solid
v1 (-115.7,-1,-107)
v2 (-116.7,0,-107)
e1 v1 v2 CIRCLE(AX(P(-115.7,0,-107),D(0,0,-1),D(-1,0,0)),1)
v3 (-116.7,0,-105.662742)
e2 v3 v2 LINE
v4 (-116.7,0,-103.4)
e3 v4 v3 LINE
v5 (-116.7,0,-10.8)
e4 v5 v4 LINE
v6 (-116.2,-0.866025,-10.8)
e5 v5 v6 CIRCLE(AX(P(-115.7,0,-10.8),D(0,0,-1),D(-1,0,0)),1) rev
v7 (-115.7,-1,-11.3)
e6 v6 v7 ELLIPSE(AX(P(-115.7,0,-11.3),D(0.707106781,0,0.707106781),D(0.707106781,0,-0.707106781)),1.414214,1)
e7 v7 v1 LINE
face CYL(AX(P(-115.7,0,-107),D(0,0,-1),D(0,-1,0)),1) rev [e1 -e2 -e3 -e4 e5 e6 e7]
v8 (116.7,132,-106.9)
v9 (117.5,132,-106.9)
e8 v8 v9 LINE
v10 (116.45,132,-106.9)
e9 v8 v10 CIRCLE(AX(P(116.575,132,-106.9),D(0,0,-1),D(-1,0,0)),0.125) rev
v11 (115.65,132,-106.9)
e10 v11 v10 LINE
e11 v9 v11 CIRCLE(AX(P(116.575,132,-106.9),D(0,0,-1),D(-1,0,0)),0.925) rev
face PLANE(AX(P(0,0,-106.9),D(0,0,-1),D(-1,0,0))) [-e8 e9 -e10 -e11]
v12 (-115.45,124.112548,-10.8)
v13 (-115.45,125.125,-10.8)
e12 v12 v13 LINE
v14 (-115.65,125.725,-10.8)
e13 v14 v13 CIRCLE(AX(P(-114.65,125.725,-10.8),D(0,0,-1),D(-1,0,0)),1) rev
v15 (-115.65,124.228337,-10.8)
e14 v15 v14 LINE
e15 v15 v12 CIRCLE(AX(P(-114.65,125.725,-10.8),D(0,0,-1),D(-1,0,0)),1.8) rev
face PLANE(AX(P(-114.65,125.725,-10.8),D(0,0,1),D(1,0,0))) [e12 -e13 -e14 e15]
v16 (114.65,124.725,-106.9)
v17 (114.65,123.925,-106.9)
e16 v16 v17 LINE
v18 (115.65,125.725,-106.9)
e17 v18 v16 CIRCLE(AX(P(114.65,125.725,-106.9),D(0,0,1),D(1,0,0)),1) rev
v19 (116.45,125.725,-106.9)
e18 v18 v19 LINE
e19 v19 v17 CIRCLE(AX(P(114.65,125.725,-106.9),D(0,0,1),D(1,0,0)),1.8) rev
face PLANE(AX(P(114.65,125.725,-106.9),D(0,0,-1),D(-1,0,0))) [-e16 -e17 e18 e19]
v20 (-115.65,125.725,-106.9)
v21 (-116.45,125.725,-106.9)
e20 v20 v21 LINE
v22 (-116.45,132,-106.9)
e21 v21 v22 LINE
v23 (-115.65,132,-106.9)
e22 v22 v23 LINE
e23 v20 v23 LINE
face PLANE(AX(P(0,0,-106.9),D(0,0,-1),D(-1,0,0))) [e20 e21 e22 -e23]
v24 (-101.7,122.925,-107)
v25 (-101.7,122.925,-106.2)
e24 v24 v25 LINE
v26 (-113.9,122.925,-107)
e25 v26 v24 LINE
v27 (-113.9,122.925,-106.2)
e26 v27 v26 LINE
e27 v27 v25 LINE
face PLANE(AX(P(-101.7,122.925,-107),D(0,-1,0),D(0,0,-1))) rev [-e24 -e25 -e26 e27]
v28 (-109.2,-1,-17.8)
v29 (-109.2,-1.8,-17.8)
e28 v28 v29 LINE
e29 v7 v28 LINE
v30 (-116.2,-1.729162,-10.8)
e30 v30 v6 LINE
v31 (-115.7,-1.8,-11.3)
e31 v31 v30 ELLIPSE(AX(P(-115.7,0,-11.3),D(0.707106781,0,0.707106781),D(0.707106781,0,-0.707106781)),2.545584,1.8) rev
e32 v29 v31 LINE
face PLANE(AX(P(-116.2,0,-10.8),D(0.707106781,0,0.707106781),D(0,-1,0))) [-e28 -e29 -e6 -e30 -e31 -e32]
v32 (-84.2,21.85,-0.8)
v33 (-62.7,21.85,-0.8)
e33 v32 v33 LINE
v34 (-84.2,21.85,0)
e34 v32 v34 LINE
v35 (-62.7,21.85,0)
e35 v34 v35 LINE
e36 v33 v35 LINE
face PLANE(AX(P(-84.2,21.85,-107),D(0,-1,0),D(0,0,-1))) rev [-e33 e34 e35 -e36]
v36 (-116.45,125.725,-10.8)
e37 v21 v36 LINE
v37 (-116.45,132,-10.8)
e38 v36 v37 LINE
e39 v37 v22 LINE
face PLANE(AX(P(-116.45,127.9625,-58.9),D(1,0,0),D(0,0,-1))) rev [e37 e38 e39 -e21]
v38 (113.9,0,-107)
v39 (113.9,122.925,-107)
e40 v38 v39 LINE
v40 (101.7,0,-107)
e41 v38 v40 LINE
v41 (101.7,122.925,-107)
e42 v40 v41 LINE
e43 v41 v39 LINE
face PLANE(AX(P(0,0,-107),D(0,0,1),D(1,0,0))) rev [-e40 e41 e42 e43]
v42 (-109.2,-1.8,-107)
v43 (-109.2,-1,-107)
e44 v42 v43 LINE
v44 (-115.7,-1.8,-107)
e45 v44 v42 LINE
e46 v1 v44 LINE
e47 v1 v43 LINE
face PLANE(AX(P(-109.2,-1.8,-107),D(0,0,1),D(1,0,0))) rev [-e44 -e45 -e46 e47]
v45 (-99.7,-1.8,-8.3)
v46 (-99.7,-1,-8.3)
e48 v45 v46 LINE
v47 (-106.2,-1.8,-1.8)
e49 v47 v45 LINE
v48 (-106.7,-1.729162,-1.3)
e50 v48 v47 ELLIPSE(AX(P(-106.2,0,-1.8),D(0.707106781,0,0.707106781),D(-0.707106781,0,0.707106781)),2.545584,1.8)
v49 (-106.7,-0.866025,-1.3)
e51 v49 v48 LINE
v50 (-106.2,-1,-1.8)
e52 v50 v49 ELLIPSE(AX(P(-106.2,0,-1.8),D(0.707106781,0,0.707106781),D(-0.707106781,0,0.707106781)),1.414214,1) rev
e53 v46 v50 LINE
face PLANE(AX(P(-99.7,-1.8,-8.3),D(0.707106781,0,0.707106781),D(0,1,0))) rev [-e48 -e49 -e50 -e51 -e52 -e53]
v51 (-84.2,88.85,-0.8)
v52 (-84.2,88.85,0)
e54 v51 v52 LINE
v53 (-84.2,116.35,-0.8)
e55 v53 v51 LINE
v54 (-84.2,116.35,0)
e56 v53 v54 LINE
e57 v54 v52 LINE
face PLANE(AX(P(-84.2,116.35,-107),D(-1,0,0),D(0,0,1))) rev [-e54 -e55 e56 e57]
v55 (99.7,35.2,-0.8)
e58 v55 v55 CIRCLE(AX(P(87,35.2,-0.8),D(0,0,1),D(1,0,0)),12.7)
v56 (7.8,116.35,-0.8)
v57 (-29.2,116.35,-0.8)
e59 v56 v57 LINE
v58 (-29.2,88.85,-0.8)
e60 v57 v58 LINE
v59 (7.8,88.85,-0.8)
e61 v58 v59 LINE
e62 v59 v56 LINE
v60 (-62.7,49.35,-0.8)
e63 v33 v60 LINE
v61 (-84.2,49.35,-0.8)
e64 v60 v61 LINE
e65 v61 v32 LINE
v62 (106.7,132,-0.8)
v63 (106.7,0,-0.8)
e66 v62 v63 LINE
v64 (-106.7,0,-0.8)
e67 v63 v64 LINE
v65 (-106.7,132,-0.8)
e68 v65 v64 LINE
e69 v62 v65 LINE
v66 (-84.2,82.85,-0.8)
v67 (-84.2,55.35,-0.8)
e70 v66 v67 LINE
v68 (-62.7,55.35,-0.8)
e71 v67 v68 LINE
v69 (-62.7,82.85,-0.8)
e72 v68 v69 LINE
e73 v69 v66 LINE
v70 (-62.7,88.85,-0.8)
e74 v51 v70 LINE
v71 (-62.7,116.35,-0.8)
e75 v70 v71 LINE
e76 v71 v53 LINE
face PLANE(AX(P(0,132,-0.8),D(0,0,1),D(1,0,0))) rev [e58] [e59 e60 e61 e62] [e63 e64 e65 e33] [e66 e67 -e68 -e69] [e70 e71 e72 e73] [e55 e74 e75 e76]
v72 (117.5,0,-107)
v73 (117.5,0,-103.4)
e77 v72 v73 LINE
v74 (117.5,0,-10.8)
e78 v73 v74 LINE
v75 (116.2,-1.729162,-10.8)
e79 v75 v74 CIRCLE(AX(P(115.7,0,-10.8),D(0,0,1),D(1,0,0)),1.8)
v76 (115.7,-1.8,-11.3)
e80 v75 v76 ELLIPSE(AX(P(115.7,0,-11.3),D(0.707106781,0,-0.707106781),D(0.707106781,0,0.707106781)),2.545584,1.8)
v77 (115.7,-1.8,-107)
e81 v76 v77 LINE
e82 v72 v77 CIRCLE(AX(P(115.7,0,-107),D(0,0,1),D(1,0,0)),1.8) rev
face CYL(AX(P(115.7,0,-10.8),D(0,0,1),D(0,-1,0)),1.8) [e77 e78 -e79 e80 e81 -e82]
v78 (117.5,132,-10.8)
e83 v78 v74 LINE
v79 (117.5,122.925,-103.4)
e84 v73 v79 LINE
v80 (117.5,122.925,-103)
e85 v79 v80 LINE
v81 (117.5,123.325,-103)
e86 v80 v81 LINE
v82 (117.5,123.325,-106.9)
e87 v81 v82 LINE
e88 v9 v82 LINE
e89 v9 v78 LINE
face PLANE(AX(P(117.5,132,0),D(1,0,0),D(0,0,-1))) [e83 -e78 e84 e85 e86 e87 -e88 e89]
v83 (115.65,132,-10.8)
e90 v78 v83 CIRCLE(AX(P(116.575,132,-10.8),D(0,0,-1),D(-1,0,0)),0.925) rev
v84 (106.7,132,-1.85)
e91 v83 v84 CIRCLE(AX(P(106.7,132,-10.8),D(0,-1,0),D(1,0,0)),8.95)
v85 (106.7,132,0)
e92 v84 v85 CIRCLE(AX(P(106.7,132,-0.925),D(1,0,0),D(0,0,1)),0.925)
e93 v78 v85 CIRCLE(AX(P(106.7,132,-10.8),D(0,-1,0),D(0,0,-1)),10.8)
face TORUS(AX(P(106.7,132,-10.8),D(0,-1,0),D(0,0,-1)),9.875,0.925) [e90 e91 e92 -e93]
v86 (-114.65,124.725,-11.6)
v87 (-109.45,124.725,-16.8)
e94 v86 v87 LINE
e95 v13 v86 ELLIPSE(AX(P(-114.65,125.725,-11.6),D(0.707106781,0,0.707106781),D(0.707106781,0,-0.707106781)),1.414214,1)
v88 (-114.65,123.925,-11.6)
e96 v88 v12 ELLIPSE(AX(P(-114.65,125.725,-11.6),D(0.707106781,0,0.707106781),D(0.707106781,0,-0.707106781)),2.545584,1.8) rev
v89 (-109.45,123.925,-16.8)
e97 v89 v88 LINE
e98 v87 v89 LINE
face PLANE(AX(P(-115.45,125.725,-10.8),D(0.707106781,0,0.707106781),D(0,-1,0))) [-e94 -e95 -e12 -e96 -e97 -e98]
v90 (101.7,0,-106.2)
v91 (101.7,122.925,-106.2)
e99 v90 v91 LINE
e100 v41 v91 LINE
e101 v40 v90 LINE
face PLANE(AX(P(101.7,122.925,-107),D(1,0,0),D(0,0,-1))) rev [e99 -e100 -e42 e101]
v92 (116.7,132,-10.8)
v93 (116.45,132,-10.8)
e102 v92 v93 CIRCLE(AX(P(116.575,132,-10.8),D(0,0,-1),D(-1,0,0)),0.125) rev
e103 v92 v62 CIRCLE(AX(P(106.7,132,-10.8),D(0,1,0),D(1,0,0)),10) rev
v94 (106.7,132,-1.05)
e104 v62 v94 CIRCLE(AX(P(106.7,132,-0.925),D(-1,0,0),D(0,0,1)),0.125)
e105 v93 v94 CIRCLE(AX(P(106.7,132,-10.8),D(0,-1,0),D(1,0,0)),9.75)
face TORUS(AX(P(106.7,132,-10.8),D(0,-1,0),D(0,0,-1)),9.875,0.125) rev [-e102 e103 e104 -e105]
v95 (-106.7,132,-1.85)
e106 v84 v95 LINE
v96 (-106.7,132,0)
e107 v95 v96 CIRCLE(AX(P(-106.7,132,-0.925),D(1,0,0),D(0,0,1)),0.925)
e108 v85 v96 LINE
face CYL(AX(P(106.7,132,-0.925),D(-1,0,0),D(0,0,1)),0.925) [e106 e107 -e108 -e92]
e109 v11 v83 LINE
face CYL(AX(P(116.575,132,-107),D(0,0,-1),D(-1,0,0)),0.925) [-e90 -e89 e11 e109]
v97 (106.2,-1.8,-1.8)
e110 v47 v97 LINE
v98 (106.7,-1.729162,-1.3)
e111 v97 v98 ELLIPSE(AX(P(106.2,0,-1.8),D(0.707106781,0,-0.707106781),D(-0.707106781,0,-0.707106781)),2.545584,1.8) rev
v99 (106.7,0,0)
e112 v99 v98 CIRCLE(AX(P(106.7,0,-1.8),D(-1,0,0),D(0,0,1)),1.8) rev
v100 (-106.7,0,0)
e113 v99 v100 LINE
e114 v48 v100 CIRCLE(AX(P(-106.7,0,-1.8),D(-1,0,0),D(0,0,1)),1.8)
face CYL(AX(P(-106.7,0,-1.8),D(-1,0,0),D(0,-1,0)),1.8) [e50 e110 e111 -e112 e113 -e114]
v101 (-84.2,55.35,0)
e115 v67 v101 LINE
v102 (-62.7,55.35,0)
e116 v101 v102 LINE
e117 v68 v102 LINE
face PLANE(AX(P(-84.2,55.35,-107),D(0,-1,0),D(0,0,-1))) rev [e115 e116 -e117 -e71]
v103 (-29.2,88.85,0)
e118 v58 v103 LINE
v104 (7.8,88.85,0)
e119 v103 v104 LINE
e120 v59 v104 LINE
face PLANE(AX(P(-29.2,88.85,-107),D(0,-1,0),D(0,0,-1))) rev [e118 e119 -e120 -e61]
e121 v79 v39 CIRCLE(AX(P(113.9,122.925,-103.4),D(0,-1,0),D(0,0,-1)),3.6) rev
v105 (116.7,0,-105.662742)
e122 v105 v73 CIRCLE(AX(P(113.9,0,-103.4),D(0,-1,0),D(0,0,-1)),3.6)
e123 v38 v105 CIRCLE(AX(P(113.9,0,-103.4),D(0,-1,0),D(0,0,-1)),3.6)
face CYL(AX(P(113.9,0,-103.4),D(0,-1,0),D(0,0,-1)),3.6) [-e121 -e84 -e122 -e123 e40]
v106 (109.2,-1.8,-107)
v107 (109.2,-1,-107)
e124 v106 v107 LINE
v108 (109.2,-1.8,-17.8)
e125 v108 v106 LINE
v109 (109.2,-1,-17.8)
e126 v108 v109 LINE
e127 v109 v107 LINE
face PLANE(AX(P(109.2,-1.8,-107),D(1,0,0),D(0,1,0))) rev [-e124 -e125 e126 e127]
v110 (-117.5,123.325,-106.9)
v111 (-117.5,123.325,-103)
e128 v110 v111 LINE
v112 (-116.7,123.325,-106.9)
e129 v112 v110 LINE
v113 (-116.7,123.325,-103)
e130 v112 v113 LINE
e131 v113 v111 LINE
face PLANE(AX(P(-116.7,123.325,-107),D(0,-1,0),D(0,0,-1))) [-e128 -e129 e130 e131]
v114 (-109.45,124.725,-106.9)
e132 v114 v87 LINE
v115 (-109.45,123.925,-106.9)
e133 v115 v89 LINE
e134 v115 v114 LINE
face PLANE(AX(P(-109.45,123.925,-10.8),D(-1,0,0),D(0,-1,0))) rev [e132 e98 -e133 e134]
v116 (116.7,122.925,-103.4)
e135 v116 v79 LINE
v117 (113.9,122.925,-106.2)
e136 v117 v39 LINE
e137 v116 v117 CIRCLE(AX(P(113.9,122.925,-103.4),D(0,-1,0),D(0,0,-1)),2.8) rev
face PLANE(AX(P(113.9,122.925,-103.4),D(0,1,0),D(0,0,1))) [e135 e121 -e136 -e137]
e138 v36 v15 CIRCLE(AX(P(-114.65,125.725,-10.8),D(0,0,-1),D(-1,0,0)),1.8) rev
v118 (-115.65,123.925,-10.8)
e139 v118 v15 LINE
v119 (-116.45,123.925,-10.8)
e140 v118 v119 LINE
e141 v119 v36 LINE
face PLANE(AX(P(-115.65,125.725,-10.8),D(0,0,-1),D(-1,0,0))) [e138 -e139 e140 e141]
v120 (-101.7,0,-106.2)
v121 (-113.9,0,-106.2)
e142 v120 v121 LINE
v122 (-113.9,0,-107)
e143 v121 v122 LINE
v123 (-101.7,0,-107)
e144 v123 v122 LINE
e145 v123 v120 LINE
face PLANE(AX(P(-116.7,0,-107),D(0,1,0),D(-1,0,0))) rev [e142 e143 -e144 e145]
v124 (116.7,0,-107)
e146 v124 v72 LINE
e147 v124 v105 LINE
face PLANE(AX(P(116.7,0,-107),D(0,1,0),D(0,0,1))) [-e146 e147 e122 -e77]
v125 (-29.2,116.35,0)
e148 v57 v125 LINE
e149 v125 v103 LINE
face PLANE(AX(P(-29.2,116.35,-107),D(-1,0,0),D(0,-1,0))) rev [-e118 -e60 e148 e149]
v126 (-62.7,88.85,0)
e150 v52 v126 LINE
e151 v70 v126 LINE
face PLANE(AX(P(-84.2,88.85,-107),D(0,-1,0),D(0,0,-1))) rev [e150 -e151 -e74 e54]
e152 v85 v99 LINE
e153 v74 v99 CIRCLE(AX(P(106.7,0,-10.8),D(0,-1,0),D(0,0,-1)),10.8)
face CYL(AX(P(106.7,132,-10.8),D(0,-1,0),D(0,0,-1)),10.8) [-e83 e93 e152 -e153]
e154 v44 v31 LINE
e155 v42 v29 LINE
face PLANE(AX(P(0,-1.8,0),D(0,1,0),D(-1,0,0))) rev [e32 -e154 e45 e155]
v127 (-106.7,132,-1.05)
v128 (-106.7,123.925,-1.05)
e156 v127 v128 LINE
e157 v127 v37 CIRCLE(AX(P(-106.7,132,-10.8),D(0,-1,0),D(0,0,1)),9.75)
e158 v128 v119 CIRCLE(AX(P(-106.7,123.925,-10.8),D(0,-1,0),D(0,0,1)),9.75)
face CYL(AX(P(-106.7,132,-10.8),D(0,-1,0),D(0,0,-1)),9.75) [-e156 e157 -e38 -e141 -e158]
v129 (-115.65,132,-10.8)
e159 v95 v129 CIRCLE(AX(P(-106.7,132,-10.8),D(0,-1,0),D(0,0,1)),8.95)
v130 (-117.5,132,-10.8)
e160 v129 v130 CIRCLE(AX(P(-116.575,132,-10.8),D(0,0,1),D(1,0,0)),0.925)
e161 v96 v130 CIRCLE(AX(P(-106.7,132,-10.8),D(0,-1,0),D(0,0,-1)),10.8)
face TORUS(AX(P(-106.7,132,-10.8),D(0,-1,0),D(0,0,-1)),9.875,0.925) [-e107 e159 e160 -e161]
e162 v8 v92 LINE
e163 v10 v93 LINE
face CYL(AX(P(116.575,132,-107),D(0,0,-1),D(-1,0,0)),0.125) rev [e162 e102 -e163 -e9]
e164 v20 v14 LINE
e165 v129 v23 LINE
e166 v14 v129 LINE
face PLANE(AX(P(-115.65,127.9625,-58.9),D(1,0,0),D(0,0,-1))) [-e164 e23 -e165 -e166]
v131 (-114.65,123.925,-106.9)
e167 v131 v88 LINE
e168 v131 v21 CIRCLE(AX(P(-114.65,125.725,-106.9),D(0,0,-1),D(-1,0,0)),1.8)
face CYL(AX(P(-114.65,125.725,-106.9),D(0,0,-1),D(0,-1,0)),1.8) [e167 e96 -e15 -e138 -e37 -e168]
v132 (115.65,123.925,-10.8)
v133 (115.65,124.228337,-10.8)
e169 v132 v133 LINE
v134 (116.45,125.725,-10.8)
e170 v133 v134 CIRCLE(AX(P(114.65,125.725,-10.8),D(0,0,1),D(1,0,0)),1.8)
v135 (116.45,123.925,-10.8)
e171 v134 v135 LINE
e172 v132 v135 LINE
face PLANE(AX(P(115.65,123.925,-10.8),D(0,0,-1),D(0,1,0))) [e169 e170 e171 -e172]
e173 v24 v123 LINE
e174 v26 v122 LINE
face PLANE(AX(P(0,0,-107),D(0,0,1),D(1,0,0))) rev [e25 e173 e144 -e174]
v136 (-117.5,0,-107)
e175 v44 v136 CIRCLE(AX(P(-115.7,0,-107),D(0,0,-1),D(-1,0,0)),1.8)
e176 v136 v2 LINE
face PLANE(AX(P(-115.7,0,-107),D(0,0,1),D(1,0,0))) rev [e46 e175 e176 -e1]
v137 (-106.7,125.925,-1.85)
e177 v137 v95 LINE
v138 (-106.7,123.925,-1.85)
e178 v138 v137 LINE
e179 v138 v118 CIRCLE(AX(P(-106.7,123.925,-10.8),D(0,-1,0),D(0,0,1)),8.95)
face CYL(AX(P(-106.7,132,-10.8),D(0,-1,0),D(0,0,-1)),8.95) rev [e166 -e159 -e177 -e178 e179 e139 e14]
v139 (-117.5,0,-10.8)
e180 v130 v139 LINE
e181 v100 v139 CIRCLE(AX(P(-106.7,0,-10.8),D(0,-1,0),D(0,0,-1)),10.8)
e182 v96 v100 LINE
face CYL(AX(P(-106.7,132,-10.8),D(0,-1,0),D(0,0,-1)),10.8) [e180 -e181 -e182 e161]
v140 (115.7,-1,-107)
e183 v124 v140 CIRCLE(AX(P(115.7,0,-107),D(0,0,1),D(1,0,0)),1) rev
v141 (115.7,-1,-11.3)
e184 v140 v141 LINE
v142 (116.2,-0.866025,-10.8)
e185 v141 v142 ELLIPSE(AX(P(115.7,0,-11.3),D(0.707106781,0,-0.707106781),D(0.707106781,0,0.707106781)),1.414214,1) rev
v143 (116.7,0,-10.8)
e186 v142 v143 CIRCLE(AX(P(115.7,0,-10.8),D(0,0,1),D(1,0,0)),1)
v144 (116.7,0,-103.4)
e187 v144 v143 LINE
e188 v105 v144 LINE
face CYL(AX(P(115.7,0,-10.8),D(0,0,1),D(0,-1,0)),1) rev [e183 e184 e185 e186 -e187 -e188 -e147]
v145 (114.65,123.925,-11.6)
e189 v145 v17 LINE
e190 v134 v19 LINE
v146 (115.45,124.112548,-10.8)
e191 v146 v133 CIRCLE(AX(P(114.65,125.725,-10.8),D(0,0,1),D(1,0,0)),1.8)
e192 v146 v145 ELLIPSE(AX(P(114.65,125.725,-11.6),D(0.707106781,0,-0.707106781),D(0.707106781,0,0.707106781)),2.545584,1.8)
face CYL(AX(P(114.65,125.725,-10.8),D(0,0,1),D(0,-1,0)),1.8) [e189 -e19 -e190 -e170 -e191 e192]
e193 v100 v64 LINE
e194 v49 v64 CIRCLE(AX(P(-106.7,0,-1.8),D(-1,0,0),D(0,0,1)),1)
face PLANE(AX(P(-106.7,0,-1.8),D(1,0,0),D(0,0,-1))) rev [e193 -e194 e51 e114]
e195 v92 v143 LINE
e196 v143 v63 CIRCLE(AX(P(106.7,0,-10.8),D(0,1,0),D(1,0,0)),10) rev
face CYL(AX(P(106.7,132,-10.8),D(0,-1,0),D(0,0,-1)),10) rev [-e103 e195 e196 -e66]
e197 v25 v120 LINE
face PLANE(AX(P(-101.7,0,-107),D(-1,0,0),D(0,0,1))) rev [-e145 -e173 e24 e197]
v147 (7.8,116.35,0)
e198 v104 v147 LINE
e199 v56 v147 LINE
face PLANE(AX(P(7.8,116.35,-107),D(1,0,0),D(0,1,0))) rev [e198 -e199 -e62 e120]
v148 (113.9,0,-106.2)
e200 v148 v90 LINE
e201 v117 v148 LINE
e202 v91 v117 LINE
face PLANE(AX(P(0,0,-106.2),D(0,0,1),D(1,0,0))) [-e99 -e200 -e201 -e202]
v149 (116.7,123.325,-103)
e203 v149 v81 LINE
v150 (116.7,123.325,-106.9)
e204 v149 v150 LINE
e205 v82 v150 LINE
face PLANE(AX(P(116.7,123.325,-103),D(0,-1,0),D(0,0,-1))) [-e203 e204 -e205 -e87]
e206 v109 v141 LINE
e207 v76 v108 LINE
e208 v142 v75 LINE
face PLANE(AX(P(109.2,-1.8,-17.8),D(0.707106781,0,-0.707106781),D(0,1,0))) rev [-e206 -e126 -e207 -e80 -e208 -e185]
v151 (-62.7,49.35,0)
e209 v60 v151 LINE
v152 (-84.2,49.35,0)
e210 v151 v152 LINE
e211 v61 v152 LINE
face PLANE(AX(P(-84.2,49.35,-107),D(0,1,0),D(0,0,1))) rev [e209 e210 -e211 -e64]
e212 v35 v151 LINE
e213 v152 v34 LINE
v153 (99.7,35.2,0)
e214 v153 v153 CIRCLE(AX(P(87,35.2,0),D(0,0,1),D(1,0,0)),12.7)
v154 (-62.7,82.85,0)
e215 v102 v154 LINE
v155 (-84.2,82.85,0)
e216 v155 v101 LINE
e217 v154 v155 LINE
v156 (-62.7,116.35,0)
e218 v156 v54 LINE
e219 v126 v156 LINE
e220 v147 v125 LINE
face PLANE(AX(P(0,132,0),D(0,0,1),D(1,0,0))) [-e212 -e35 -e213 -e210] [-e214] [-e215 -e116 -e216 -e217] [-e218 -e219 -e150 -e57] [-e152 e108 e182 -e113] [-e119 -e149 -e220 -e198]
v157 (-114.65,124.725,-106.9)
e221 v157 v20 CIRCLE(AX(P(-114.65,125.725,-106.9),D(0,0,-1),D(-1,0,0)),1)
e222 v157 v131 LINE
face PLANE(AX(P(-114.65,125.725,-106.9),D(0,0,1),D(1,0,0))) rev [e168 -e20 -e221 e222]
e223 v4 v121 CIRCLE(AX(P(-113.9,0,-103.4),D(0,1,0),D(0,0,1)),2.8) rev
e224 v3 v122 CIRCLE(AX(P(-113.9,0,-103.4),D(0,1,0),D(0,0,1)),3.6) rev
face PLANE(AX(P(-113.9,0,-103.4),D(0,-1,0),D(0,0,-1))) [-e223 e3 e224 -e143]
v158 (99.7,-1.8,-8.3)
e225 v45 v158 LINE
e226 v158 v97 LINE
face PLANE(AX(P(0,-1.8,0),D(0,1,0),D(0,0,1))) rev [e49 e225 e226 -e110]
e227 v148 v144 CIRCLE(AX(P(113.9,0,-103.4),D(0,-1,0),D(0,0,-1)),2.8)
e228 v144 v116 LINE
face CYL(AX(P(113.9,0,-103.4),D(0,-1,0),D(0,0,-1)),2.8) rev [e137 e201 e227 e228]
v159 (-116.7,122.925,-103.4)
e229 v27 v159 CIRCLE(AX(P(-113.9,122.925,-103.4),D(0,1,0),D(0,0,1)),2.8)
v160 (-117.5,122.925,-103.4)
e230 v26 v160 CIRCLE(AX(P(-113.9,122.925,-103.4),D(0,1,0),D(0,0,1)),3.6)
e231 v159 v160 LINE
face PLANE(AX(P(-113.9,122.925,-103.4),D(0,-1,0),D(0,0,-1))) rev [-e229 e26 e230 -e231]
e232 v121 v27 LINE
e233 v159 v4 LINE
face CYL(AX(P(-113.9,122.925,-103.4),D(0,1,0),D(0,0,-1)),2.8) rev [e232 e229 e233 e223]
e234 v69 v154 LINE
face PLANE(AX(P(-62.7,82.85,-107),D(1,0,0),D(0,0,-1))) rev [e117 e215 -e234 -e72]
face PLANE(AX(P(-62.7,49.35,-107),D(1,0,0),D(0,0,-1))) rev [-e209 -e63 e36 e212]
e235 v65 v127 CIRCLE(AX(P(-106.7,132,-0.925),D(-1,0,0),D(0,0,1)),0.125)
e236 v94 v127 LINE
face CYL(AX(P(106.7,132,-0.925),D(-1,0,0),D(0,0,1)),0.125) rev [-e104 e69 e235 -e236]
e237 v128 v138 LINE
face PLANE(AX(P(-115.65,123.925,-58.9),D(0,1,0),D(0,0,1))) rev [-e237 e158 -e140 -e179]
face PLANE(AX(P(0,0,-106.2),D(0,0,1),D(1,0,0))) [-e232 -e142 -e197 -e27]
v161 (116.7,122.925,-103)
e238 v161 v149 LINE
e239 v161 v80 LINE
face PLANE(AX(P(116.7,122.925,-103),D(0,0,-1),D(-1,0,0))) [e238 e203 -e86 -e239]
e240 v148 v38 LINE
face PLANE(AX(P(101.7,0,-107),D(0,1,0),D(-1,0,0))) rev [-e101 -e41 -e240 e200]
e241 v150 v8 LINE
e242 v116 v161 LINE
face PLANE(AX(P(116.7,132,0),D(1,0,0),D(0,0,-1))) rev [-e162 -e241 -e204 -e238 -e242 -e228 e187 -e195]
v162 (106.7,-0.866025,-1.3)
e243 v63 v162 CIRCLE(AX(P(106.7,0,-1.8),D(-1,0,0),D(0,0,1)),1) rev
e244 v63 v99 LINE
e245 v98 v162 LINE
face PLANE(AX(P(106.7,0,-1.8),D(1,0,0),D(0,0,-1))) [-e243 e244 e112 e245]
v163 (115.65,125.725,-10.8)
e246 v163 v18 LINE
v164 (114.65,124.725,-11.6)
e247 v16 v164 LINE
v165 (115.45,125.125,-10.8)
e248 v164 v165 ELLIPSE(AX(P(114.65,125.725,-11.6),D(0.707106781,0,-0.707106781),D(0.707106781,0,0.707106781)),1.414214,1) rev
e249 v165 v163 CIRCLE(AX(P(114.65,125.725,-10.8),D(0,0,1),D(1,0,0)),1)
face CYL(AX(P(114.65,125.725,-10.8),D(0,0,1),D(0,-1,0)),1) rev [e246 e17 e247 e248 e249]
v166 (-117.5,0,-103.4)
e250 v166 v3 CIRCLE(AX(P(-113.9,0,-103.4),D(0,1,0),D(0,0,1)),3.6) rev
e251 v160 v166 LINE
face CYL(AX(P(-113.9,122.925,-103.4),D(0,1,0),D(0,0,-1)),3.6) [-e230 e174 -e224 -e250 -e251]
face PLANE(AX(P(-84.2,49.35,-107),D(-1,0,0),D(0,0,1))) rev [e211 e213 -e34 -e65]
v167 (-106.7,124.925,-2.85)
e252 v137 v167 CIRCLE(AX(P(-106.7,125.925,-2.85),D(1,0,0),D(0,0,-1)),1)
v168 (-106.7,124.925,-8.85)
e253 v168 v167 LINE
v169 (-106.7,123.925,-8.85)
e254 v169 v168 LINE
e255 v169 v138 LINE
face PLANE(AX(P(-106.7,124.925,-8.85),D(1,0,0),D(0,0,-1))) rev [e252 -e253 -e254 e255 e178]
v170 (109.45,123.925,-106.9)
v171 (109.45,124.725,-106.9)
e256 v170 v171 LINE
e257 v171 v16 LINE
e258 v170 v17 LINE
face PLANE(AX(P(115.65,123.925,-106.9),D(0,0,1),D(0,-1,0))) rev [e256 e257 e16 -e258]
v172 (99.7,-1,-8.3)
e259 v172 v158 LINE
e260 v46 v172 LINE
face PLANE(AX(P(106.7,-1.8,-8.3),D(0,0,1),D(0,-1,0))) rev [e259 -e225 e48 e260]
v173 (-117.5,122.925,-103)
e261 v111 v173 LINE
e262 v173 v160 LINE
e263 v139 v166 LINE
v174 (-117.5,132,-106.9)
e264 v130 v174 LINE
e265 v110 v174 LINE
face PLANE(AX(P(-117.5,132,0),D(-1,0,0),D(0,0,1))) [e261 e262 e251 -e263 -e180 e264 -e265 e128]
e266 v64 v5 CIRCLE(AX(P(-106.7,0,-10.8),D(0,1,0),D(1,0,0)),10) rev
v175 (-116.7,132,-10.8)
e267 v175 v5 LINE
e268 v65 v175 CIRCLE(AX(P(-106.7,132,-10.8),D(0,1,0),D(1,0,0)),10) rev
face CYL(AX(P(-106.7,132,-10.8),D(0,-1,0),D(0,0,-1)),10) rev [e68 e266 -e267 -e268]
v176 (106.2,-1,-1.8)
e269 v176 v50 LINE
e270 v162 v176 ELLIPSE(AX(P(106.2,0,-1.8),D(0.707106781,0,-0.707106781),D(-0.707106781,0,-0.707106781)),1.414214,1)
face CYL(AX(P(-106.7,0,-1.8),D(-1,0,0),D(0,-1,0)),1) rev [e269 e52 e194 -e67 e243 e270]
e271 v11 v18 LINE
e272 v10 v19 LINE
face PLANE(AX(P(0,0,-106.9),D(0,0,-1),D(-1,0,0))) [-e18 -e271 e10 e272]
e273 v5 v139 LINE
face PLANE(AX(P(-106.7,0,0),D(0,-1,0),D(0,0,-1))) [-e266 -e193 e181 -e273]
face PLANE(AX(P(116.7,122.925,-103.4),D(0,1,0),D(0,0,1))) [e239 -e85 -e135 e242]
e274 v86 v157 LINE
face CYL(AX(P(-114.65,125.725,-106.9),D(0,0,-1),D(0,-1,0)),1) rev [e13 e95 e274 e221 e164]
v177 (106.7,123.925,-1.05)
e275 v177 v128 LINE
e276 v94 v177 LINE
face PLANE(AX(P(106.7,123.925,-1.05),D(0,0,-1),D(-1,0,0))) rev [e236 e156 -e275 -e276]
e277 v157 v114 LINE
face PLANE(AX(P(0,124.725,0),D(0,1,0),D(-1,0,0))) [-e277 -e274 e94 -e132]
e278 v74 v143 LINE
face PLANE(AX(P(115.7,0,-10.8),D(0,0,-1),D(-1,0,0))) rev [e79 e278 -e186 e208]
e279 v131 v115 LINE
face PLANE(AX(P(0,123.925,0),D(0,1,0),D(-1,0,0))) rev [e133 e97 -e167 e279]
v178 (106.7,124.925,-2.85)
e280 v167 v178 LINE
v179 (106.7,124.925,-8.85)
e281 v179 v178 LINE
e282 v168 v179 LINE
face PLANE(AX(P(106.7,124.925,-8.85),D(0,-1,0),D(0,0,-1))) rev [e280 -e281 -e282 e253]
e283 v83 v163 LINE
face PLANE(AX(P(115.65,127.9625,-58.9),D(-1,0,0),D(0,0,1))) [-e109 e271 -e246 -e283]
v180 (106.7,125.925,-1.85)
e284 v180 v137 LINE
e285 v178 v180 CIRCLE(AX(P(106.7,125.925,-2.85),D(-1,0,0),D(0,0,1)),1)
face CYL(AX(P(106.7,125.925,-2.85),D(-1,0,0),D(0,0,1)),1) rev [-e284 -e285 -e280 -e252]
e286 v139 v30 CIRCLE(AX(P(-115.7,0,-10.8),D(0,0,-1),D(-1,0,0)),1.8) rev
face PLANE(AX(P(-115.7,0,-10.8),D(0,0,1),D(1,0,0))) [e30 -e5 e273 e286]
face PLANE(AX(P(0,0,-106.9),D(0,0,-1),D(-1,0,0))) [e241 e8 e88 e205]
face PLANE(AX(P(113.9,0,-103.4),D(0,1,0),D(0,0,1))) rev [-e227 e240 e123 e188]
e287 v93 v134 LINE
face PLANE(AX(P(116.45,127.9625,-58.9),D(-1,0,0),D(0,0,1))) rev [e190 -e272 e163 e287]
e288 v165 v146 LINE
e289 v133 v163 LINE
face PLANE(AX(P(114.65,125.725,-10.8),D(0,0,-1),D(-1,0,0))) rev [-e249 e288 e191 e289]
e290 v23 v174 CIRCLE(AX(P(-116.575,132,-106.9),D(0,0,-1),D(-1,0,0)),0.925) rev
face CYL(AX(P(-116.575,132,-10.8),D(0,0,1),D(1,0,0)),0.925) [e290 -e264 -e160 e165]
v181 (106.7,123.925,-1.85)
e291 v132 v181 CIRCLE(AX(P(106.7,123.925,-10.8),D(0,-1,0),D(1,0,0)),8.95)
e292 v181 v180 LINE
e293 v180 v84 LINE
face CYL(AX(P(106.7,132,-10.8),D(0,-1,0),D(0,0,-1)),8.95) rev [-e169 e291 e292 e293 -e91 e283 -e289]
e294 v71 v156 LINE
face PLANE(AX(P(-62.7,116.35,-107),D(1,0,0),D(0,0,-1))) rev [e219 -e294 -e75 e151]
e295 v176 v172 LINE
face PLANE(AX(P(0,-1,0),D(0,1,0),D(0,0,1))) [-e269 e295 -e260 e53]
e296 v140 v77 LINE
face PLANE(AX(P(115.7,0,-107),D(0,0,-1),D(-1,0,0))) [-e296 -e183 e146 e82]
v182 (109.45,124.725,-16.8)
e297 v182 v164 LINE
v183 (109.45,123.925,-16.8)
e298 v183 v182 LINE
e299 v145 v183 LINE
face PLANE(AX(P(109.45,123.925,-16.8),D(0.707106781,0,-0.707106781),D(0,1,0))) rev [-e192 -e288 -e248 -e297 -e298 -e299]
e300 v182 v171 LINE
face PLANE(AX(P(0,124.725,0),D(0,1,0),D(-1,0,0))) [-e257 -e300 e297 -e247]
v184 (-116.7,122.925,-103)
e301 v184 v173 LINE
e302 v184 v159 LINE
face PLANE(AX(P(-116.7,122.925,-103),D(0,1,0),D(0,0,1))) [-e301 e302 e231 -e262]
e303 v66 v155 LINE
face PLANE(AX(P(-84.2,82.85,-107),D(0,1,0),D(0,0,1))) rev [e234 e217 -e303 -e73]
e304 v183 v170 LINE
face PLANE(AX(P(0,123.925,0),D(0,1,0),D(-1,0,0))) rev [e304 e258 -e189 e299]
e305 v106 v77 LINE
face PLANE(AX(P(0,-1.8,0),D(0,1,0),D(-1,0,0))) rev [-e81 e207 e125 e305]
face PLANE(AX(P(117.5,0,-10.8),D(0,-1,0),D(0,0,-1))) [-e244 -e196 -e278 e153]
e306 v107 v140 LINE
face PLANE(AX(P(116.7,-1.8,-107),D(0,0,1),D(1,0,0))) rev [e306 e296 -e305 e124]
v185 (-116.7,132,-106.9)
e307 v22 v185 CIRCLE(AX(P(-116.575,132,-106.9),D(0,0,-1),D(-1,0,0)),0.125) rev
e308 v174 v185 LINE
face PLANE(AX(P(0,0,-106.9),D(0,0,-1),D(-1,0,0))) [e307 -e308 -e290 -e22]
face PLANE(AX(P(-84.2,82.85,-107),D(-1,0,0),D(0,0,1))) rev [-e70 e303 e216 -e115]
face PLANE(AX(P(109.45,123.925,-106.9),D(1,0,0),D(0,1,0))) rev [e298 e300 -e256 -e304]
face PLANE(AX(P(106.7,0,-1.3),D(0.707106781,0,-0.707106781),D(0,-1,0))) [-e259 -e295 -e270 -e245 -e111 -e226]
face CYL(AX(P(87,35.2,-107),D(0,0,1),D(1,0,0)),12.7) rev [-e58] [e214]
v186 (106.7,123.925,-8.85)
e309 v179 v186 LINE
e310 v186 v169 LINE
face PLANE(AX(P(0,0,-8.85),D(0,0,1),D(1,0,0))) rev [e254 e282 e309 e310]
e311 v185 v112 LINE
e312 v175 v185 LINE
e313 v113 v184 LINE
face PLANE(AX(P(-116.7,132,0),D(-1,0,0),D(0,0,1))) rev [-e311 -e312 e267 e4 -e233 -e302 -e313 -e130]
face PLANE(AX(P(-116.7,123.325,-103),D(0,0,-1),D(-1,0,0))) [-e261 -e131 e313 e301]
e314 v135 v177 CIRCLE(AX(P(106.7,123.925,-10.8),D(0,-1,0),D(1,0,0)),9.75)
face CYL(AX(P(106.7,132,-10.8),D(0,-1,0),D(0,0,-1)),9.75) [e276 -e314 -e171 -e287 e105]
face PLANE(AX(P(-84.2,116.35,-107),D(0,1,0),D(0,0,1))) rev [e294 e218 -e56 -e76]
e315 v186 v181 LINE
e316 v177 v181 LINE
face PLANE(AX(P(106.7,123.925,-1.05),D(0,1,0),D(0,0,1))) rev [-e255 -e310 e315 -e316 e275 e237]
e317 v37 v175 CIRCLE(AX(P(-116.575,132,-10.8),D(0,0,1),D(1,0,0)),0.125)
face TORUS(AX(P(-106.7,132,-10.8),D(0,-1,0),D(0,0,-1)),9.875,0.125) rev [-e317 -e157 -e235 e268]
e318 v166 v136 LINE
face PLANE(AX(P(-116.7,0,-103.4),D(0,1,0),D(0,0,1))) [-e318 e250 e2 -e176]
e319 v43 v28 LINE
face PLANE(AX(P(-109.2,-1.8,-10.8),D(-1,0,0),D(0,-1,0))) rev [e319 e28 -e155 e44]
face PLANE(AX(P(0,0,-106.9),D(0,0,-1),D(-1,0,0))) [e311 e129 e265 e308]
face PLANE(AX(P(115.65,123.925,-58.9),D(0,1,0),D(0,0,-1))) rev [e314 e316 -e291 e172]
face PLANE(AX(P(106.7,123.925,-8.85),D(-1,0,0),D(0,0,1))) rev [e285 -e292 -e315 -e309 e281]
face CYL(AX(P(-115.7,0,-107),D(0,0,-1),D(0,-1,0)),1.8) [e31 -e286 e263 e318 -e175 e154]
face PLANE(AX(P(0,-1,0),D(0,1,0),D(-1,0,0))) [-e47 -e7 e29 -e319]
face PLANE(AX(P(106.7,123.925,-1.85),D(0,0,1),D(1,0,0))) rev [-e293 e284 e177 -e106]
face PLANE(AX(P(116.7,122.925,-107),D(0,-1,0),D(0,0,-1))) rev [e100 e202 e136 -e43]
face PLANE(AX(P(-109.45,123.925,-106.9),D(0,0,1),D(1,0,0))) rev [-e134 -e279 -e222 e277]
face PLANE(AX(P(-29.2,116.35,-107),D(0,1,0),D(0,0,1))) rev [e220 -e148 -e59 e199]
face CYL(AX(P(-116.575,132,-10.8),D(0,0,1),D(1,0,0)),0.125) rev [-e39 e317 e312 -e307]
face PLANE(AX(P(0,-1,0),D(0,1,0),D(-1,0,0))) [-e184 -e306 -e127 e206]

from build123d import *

# Parameters (mm, degrees)
BASE_FLANGE1_DEPTH        = 132
HEM2_START                = -107
HEM2_DEPTH                = 96.2
SKETCH31_R                = 12.7
CUT_EXTRUDE1_DEPTH        = 208.181817916
EDGE_FLANGE1_DEPTH        = 96.2
EDGE_FLANGE1_BEND_DEPTH   = 213.4
EDGE_FLANGE1_BEND_2_DEPTH = 96.2
CHAMFER1_SIZE             = 7
SKETCH41_W                = 21.5
SKETCH41_H                = 27.5
CUT_EXTRUDE2_DEPTH        = 208.181817916
LPATTERN1_COUNT           = 3
LPATTERN1_PITCH           = 33.5
SKETCH44_W                = 235
SKETCH44_H                = 10
CUT_EXTRUDE3_DEPTH        = 0.1
EDGE_FLANGE2_DEPTH        = 123.325
EDGE_FLANGE2_START        = 122.925
EDGE_FLANGE2_2_DEPTH      = 0.4
EDGE_FLANGE2_3_DEPTH      = 122.925
EDGE_FLANGE4_START        = -106.9
EDGE_FLANGE4_DEPTH        = 96.1
EDGE_FLANGE4_2_DEPTH      = 96.1
CHAMFER2_SIZE             = 6
SKETCH80_W                = 213.4
SKETCH80_H                = 1
BOSS_EXTRUDE1_DEPTH       = 7
FILLET1_R                 = 1
SKETCH92_W                = 37
SKETCH92_H                = 27.5
CUT_EXTRUDE4_DEPTH        = 208.181817916


# Read off the part's stored shape, not the designer's step: Hem2, Edge-Flange2, Edge-Flange4
# Sheet-metal steps are written as plain solids
with BuildPart() as part:
    # Sketch1 → Base-Flange1 (new body)
    with BuildSketch(Plane(origin=(0, 0, 0), x_dir=(1, 0, 0), z_dir=(0, 1, 0))):
        with BuildLine():
            Line((117.5, 107), (117.5, 10.8))
            ThreePointArc((117.5, 10.8), (114.336753237, 3.163246763), (106.7, 0))
            Line((106.7, 0), (0, 0))
            Line((0, 0), (-106.7, 0))
            ThreePointArc((-106.7, 0), (-114.336753237, 3.163246763), (-117.5, 10.8))
            Line((-117.5, 10.8), (-117.5, 107))
            Line((-117.5, 107), (-116.7, 107))
            Line((-116.7, 107), (-116.7, 10.8))
            ThreePointArc((-116.7, 10.8), (-113.771067812, 3.728932188), (-106.7, 0.8))
            Line((-106.7, 0.8), (0, 0.8))
            Line((0, 0.8), (106.7, 0.8))
            ThreePointArc((106.7, 0.8), (113.771067812, 3.728932188), (116.7, 10.8))
            Line((116.7, 10.8), (116.7, 107))
            Line((116.7, 107), (117.5, 107))
        make_face()
    extrude(amount=BASE_FLANGE1_DEPTH)

    # Hem2 outline → Hem2 (add)
    with BuildSketch(Plane.XY.offset(HEM2_START)):
        with BuildLine():
            Line((-116.45, 123.925), (-115.65, 123.925))
            Line((-115.65, 123.925), (-115.65, 132))
            ThreePointArc((-115.65, 132), (-116.575, 132.925), (-117.5, 132))
            Line((-117.5, 132), (-116.7, 132))
            ThreePointArc((-116.7, 132), (-116.575, 132.125), (-116.45, 132))
            Line((-116.45, 132), (-116.45, 123.925))
        make_face()
        with BuildLine():
            Line((115.65, 123.925), (116.45, 123.925))
            Line((116.45, 123.925), (116.45, 132))
            ThreePointArc((116.45, 132), (116.575, 132.125), (116.7, 132))
            Line((116.7, 132), (117.5, 132))
            ThreePointArc((117.5, 132), (116.575, 132.925), (115.65, 132))
            Line((115.65, 132), (115.65, 123.925))
        make_face()
    extrude(amount=HEM2_DEPTH)

    # Sweep1: sweep along a path in Sketch30
    with BuildLine(Plane(origin=(0, 132, 0), x_dir=(1, 0, 0), z_dir=(0, 1, 0))) as sweep1_path:
        ThreePointArc((-116.7, 10.8), (-113.771067812, 3.728932188), (-106.7, 0.8))
        Line((-106.7, 0.8), (106.7, 0.8))
        ThreePointArc((106.7, 0.8), (113.771067812, 3.728932188), (116.7, 10.8))
    # Sketch29 → Sweep1 (sweep)
    with BuildSketch(Plane.XY.offset(-10.8)):
        with BuildLine():
            Line((-117.5, 132), (-116.7, 132))
            ThreePointArc((-116.7, 132), (-116.575, 132.125), (-116.45, 132))
            Line((-116.45, 132), (-116.45, 123.925))
            Line((-116.45, 123.925), (-115.65, 123.925))
            Line((-115.65, 123.925), (-115.65, 132))
            ThreePointArc((-115.65, 132), (-116.575, 132.925), (-117.5, 132))
        make_face()
    sweep(path=sweep1_path.line)

    # Sketch31 → Cut-Extrude1 (cut, through all)
    with BuildSketch(Plane.XY):
        with Locations((87, 35.2)):
            Circle(SKETCH31_R)
    extrude(amount=-CUT_EXTRUDE1_DEPTH, mode=Mode.SUBTRACT)

    # Edge-Flange1 section (across the edge) → Edge-Flange1 (add)
    with BuildSketch(Plane(origin=(-116.7, -1, -10.8), x_dir=(0, 1, 0), z_dir=(0, 0, -1))):
        with BuildLine():
            Line((-0.8, 1), (-0.8, 7.5))
            Line((-0.8, 7.5), (0, 7.5))
            Line((0, 7.5), (0, 1))
            ThreePointArc((0, 1), (0.292893219, 0.292893219), (1, 0))
            Line((1, 0), (1, -0.8))
            ThreePointArc((1, -0.8), (-0.272792206, -0.272792206), (-0.8, 1))
        make_face()
    extrude(amount=EDGE_FLANGE1_DEPTH)

    # Edge-Flange1 section 2 (across the edge) → Edge-Flange1 bend (add)
    with BuildSketch(Plane(origin=(106.7, -1, -0.8), x_dir=(0, 1, 0), z_dir=(-1, 0, 0))):
        with BuildLine():
            Line((-0.8, 1), (-0.8, 7.5))
            Line((-0.8, 7.5), (0, 7.5))
            Line((0, 7.5), (0, 1))
            ThreePointArc((0, 1), (0.292893219, 0.292893219), (1, 0))
            Line((1, 0), (1, -0.8))
            ThreePointArc((1, -0.8), (-0.272792206, -0.272792206), (-0.8, 1))
        make_face()
    extrude(amount=EDGE_FLANGE1_BEND_DEPTH)

    # Edge-Flange1 section 3 (across the edge) → Edge-Flange1 bend 2 (add)
    with BuildSketch(Plane(origin=(116.7, -1, -107), x_dir=(0, 1, 0), z_dir=(0, 0, 1))):
        with BuildLine():
            Line((-0.8, 1), (-0.8, 7.5))
            Line((-0.8, 7.5), (0, 7.5))
            Line((0, 7.5), (0, 1))
            ThreePointArc((0, 1), (0.292893219, 0.292893219), (1, 0))
            Line((1, 0), (1, -0.8))
            ThreePointArc((1, -0.8), (-0.272792206, -0.272792206), (-0.8, 1))
        make_face()
    extrude(amount=EDGE_FLANGE1_BEND_2_DEPTH)

    # Chamfer1
    chamfer1_edges = [part.edges().sort_by_distance(p)[0] for p in [
        (106.7, -1.4, -8.3),
        (109.2, -1.4, -10.8),
        (-106.7, -1.4, -8.3),
        (-109.2, -1.4, -10.8),
    ]]
    chamfer(chamfer1_edges, length=CHAMFER1_SIZE)

    # Sketch41 → Cut-Extrude2 (cut, through all)
    with BuildSketch(Plane.XY):
        with Locations((-73.45, 102.6)):
            Rectangle(SKETCH41_W, SKETCH41_H)
    cut_extrude2 = extrude(amount=-CUT_EXTRUDE2_DEPTH, mode=Mode.SUBTRACT)

    # LPattern1: Cut-Extrude2 ×3
    with Locations(*[(0, -i * LPATTERN1_PITCH, 0) for i in range(1, LPATTERN1_COUNT)]):
        add(cut_extrude2, mode=Mode.SUBTRACT)

    # Sketch44 → Cut-Extrude3 (cut)
    with BuildSketch(Plane(origin=(0, 0, -107), x_dir=(-1, 0, 0), z_dir=(0, 0, -1))):
        with Locations((0, 127.925)):
            Rectangle(SKETCH44_W, SKETCH44_H)
    extrude(amount=-CUT_EXTRUDE3_DEPTH, mode=Mode.SUBTRACT)

    # Edge-Flange2 outline → Edge-Flange2 (cut)
    with BuildSketch(Plane(origin=(0, 0, 0), x_dir=(1, 0, 0), z_dir=(0, 1, 0))):
        with BuildLine():
            ThreePointArc((116.7, 105.662741699), (117.29411255, 104.6), (117.5, 103.4))
            Line((117.5, 103.4), (117.5, 107))
            Line((117.5, 107), (116.7, 107))
            Line((116.7, 107), (116.7, 105.662741699))
        make_face()
        with BuildLine():
            ThreePointArc((-117.5, 103.4), (-117.29411255, 104.6), (-116.7, 105.662741699))
            Line((-116.7, 105.662741699), (-116.7, 107))
            Line((-116.7, 107), (-117.5, 107))
            Line((-117.5, 107), (-117.5, 103.4))
        make_face()
    extrude(amount=EDGE_FLANGE2_DEPTH, mode=Mode.SUBTRACT)

    # Edge-Flange2 2 outline → Edge-Flange2 2 (cut)
    with BuildSketch(Plane(origin=(0, 0, 0), x_dir=(1, 0, 0), z_dir=(0, 1, 0)).offset(EDGE_FLANGE2_START)):
        with BuildLine():
            ThreePointArc((117.5, 103.4), (117.29411255, 104.6), (116.7, 105.662741699))
            Line((116.7, 105.662741699), (116.7, 103))
            Line((116.7, 103), (117.5, 103))
            Line((117.5, 103), (117.5, 103.4))
        make_face()
        with BuildLine():
            Line((-116.7, 103), (-116.7, 105.662741699))
            ThreePointArc((-116.7, 105.662741699), (-117.29411255, 104.6), (-117.5, 103.4))
            Line((-117.5, 103.4), (-117.5, 103))
            Line((-117.5, 103), (-116.7, 103))
        make_face()
    extrude(amount=EDGE_FLANGE2_2_DEPTH, mode=Mode.SUBTRACT)

    # Edge-Flange2 3 outline → Edge-Flange2 3 (add)
    with BuildSketch(Plane(origin=(0, 0, 0), x_dir=(1, 0, 0), z_dir=(0, 1, 0))):
        with BuildLine():
            Line((113.9, 107), (101.7, 107))
            Line((101.7, 107), (101.7, 106.2))
            Line((101.7, 106.2), (113.9, 106.2))
            ThreePointArc((113.9, 106.2), (115.879898987, 105.379898987), (116.7, 103.4))
            Line((116.7, 103.4), (116.7, 105.662741699))
            ThreePointArc((116.7, 105.662741699), (115.451471863, 106.648528137), (113.9, 107))
        make_face()
        with BuildLine():
            Line((-101.7, 107), (-113.9, 107))
            ThreePointArc((-113.9, 107), (-115.451471863, 106.648528137), (-116.7, 105.662741699))
            Line((-116.7, 105.662741699), (-116.7, 103.4))
            ThreePointArc((-116.7, 103.4), (-115.879898987, 105.379898987), (-113.9, 106.2))
            Line((-113.9, 106.2), (-101.7, 106.2))
            Line((-101.7, 106.2), (-101.7, 107))
        make_face()
    extrude(amount=EDGE_FLANGE2_3_DEPTH)

    # Edge-Flange4 outline → Edge-Flange4 (cut)
    with BuildSketch(Plane.XY.offset(EDGE_FLANGE4_START)):
        with BuildLine():
            ThreePointArc((116.45, 125.725), (116.237450787, 124.876471863), (115.65, 124.228337046))
            Line((115.65, 124.228337046), (115.65, 123.925))
            Line((115.65, 123.925), (116.45, 123.925))
            Line((116.45, 123.925), (116.45, 125.725))
        make_face()
        with BuildLine():
            Line((-115.65, 123.925), (-115.65, 124.228337046))
            ThreePointArc((-115.65, 124.228337046), (-116.237450787, 124.876471863), (-116.45, 125.725))
            Line((-116.45, 125.725), (-116.45, 123.925))
            Line((-116.45, 123.925), (-115.65, 123.925))
        make_face()
    extrude(amount=EDGE_FLANGE4_DEPTH, mode=Mode.SUBTRACT)

    # Edge-Flange4 2 outline → Edge-Flange4 2 (add)
    with BuildSketch(Plane.XY.offset(EDGE_FLANGE4_START)):
        with BuildLine():
            Line((109.45, 123.925), (114.65, 123.925))
            ThreePointArc((114.65, 123.925), (115.172497216, 124.002502784), (115.65, 124.228337046))
            Line((115.65, 124.228337046), (115.65, 125.725))
            ThreePointArc((115.65, 125.725), (115.357106781, 125.017893219), (114.65, 124.725))
            Line((114.65, 124.725), (109.45, 124.725))
            Line((109.45, 124.725), (109.45, 123.925))
        make_face()
        with BuildLine():
            Line((-114.65, 123.925), (-109.45, 123.925))
            Line((-109.45, 123.925), (-109.45, 124.725))
            Line((-109.45, 124.725), (-114.65, 124.725))
            ThreePointArc((-114.65, 124.725), (-115.357106781, 125.017893219), (-115.65, 125.725))
            Line((-115.65, 125.725), (-115.65, 124.228337046))
            ThreePointArc((-115.65, 124.228337046), (-115.172497216, 124.002502784), (-114.65, 123.925))
        make_face()
    extrude(amount=EDGE_FLANGE4_2_DEPTH)

    # Chamfer2
    chamfer2_edges = [part.edges().sort_by_distance(p)[0] for p in [
        (-109.45, 124.325, -10.8),
        (109.45, 124.325, -10.8),
    ]]
    chamfer(chamfer2_edges, length=CHAMFER2_SIZE)

    # Sketch80 → Boss-Extrude1 (add)
    with BuildSketch(Plane(origin=(0, 0, -1.85), x_dir=(-1, 0, 0), z_dir=(0, 0, -1))):
        with Locations((0, 124.425)):
            Rectangle(SKETCH80_W, SKETCH80_H)
    extrude(amount=BOSS_EXTRUDE1_DEPTH)

    # Fillet1
    fillet1_edges = [part.edges().sort_by_distance(p)[0] for p in [
        (0, 124.925, -1.85),
    ]]
    fillet(fillet1_edges, radius=FILLET1_R)

    # Sketch92 → Cut-Extrude4 (cut, through all)
    with BuildSketch(Plane.XY):
        with Locations((-10.7, 102.6)):
            Rectangle(SKETCH92_W, SKETCH92_H)
    extrude(amount=-CUT_EXTRUDE4_DEPTH, mode=Mode.SUBTRACT)


solid = part.part
